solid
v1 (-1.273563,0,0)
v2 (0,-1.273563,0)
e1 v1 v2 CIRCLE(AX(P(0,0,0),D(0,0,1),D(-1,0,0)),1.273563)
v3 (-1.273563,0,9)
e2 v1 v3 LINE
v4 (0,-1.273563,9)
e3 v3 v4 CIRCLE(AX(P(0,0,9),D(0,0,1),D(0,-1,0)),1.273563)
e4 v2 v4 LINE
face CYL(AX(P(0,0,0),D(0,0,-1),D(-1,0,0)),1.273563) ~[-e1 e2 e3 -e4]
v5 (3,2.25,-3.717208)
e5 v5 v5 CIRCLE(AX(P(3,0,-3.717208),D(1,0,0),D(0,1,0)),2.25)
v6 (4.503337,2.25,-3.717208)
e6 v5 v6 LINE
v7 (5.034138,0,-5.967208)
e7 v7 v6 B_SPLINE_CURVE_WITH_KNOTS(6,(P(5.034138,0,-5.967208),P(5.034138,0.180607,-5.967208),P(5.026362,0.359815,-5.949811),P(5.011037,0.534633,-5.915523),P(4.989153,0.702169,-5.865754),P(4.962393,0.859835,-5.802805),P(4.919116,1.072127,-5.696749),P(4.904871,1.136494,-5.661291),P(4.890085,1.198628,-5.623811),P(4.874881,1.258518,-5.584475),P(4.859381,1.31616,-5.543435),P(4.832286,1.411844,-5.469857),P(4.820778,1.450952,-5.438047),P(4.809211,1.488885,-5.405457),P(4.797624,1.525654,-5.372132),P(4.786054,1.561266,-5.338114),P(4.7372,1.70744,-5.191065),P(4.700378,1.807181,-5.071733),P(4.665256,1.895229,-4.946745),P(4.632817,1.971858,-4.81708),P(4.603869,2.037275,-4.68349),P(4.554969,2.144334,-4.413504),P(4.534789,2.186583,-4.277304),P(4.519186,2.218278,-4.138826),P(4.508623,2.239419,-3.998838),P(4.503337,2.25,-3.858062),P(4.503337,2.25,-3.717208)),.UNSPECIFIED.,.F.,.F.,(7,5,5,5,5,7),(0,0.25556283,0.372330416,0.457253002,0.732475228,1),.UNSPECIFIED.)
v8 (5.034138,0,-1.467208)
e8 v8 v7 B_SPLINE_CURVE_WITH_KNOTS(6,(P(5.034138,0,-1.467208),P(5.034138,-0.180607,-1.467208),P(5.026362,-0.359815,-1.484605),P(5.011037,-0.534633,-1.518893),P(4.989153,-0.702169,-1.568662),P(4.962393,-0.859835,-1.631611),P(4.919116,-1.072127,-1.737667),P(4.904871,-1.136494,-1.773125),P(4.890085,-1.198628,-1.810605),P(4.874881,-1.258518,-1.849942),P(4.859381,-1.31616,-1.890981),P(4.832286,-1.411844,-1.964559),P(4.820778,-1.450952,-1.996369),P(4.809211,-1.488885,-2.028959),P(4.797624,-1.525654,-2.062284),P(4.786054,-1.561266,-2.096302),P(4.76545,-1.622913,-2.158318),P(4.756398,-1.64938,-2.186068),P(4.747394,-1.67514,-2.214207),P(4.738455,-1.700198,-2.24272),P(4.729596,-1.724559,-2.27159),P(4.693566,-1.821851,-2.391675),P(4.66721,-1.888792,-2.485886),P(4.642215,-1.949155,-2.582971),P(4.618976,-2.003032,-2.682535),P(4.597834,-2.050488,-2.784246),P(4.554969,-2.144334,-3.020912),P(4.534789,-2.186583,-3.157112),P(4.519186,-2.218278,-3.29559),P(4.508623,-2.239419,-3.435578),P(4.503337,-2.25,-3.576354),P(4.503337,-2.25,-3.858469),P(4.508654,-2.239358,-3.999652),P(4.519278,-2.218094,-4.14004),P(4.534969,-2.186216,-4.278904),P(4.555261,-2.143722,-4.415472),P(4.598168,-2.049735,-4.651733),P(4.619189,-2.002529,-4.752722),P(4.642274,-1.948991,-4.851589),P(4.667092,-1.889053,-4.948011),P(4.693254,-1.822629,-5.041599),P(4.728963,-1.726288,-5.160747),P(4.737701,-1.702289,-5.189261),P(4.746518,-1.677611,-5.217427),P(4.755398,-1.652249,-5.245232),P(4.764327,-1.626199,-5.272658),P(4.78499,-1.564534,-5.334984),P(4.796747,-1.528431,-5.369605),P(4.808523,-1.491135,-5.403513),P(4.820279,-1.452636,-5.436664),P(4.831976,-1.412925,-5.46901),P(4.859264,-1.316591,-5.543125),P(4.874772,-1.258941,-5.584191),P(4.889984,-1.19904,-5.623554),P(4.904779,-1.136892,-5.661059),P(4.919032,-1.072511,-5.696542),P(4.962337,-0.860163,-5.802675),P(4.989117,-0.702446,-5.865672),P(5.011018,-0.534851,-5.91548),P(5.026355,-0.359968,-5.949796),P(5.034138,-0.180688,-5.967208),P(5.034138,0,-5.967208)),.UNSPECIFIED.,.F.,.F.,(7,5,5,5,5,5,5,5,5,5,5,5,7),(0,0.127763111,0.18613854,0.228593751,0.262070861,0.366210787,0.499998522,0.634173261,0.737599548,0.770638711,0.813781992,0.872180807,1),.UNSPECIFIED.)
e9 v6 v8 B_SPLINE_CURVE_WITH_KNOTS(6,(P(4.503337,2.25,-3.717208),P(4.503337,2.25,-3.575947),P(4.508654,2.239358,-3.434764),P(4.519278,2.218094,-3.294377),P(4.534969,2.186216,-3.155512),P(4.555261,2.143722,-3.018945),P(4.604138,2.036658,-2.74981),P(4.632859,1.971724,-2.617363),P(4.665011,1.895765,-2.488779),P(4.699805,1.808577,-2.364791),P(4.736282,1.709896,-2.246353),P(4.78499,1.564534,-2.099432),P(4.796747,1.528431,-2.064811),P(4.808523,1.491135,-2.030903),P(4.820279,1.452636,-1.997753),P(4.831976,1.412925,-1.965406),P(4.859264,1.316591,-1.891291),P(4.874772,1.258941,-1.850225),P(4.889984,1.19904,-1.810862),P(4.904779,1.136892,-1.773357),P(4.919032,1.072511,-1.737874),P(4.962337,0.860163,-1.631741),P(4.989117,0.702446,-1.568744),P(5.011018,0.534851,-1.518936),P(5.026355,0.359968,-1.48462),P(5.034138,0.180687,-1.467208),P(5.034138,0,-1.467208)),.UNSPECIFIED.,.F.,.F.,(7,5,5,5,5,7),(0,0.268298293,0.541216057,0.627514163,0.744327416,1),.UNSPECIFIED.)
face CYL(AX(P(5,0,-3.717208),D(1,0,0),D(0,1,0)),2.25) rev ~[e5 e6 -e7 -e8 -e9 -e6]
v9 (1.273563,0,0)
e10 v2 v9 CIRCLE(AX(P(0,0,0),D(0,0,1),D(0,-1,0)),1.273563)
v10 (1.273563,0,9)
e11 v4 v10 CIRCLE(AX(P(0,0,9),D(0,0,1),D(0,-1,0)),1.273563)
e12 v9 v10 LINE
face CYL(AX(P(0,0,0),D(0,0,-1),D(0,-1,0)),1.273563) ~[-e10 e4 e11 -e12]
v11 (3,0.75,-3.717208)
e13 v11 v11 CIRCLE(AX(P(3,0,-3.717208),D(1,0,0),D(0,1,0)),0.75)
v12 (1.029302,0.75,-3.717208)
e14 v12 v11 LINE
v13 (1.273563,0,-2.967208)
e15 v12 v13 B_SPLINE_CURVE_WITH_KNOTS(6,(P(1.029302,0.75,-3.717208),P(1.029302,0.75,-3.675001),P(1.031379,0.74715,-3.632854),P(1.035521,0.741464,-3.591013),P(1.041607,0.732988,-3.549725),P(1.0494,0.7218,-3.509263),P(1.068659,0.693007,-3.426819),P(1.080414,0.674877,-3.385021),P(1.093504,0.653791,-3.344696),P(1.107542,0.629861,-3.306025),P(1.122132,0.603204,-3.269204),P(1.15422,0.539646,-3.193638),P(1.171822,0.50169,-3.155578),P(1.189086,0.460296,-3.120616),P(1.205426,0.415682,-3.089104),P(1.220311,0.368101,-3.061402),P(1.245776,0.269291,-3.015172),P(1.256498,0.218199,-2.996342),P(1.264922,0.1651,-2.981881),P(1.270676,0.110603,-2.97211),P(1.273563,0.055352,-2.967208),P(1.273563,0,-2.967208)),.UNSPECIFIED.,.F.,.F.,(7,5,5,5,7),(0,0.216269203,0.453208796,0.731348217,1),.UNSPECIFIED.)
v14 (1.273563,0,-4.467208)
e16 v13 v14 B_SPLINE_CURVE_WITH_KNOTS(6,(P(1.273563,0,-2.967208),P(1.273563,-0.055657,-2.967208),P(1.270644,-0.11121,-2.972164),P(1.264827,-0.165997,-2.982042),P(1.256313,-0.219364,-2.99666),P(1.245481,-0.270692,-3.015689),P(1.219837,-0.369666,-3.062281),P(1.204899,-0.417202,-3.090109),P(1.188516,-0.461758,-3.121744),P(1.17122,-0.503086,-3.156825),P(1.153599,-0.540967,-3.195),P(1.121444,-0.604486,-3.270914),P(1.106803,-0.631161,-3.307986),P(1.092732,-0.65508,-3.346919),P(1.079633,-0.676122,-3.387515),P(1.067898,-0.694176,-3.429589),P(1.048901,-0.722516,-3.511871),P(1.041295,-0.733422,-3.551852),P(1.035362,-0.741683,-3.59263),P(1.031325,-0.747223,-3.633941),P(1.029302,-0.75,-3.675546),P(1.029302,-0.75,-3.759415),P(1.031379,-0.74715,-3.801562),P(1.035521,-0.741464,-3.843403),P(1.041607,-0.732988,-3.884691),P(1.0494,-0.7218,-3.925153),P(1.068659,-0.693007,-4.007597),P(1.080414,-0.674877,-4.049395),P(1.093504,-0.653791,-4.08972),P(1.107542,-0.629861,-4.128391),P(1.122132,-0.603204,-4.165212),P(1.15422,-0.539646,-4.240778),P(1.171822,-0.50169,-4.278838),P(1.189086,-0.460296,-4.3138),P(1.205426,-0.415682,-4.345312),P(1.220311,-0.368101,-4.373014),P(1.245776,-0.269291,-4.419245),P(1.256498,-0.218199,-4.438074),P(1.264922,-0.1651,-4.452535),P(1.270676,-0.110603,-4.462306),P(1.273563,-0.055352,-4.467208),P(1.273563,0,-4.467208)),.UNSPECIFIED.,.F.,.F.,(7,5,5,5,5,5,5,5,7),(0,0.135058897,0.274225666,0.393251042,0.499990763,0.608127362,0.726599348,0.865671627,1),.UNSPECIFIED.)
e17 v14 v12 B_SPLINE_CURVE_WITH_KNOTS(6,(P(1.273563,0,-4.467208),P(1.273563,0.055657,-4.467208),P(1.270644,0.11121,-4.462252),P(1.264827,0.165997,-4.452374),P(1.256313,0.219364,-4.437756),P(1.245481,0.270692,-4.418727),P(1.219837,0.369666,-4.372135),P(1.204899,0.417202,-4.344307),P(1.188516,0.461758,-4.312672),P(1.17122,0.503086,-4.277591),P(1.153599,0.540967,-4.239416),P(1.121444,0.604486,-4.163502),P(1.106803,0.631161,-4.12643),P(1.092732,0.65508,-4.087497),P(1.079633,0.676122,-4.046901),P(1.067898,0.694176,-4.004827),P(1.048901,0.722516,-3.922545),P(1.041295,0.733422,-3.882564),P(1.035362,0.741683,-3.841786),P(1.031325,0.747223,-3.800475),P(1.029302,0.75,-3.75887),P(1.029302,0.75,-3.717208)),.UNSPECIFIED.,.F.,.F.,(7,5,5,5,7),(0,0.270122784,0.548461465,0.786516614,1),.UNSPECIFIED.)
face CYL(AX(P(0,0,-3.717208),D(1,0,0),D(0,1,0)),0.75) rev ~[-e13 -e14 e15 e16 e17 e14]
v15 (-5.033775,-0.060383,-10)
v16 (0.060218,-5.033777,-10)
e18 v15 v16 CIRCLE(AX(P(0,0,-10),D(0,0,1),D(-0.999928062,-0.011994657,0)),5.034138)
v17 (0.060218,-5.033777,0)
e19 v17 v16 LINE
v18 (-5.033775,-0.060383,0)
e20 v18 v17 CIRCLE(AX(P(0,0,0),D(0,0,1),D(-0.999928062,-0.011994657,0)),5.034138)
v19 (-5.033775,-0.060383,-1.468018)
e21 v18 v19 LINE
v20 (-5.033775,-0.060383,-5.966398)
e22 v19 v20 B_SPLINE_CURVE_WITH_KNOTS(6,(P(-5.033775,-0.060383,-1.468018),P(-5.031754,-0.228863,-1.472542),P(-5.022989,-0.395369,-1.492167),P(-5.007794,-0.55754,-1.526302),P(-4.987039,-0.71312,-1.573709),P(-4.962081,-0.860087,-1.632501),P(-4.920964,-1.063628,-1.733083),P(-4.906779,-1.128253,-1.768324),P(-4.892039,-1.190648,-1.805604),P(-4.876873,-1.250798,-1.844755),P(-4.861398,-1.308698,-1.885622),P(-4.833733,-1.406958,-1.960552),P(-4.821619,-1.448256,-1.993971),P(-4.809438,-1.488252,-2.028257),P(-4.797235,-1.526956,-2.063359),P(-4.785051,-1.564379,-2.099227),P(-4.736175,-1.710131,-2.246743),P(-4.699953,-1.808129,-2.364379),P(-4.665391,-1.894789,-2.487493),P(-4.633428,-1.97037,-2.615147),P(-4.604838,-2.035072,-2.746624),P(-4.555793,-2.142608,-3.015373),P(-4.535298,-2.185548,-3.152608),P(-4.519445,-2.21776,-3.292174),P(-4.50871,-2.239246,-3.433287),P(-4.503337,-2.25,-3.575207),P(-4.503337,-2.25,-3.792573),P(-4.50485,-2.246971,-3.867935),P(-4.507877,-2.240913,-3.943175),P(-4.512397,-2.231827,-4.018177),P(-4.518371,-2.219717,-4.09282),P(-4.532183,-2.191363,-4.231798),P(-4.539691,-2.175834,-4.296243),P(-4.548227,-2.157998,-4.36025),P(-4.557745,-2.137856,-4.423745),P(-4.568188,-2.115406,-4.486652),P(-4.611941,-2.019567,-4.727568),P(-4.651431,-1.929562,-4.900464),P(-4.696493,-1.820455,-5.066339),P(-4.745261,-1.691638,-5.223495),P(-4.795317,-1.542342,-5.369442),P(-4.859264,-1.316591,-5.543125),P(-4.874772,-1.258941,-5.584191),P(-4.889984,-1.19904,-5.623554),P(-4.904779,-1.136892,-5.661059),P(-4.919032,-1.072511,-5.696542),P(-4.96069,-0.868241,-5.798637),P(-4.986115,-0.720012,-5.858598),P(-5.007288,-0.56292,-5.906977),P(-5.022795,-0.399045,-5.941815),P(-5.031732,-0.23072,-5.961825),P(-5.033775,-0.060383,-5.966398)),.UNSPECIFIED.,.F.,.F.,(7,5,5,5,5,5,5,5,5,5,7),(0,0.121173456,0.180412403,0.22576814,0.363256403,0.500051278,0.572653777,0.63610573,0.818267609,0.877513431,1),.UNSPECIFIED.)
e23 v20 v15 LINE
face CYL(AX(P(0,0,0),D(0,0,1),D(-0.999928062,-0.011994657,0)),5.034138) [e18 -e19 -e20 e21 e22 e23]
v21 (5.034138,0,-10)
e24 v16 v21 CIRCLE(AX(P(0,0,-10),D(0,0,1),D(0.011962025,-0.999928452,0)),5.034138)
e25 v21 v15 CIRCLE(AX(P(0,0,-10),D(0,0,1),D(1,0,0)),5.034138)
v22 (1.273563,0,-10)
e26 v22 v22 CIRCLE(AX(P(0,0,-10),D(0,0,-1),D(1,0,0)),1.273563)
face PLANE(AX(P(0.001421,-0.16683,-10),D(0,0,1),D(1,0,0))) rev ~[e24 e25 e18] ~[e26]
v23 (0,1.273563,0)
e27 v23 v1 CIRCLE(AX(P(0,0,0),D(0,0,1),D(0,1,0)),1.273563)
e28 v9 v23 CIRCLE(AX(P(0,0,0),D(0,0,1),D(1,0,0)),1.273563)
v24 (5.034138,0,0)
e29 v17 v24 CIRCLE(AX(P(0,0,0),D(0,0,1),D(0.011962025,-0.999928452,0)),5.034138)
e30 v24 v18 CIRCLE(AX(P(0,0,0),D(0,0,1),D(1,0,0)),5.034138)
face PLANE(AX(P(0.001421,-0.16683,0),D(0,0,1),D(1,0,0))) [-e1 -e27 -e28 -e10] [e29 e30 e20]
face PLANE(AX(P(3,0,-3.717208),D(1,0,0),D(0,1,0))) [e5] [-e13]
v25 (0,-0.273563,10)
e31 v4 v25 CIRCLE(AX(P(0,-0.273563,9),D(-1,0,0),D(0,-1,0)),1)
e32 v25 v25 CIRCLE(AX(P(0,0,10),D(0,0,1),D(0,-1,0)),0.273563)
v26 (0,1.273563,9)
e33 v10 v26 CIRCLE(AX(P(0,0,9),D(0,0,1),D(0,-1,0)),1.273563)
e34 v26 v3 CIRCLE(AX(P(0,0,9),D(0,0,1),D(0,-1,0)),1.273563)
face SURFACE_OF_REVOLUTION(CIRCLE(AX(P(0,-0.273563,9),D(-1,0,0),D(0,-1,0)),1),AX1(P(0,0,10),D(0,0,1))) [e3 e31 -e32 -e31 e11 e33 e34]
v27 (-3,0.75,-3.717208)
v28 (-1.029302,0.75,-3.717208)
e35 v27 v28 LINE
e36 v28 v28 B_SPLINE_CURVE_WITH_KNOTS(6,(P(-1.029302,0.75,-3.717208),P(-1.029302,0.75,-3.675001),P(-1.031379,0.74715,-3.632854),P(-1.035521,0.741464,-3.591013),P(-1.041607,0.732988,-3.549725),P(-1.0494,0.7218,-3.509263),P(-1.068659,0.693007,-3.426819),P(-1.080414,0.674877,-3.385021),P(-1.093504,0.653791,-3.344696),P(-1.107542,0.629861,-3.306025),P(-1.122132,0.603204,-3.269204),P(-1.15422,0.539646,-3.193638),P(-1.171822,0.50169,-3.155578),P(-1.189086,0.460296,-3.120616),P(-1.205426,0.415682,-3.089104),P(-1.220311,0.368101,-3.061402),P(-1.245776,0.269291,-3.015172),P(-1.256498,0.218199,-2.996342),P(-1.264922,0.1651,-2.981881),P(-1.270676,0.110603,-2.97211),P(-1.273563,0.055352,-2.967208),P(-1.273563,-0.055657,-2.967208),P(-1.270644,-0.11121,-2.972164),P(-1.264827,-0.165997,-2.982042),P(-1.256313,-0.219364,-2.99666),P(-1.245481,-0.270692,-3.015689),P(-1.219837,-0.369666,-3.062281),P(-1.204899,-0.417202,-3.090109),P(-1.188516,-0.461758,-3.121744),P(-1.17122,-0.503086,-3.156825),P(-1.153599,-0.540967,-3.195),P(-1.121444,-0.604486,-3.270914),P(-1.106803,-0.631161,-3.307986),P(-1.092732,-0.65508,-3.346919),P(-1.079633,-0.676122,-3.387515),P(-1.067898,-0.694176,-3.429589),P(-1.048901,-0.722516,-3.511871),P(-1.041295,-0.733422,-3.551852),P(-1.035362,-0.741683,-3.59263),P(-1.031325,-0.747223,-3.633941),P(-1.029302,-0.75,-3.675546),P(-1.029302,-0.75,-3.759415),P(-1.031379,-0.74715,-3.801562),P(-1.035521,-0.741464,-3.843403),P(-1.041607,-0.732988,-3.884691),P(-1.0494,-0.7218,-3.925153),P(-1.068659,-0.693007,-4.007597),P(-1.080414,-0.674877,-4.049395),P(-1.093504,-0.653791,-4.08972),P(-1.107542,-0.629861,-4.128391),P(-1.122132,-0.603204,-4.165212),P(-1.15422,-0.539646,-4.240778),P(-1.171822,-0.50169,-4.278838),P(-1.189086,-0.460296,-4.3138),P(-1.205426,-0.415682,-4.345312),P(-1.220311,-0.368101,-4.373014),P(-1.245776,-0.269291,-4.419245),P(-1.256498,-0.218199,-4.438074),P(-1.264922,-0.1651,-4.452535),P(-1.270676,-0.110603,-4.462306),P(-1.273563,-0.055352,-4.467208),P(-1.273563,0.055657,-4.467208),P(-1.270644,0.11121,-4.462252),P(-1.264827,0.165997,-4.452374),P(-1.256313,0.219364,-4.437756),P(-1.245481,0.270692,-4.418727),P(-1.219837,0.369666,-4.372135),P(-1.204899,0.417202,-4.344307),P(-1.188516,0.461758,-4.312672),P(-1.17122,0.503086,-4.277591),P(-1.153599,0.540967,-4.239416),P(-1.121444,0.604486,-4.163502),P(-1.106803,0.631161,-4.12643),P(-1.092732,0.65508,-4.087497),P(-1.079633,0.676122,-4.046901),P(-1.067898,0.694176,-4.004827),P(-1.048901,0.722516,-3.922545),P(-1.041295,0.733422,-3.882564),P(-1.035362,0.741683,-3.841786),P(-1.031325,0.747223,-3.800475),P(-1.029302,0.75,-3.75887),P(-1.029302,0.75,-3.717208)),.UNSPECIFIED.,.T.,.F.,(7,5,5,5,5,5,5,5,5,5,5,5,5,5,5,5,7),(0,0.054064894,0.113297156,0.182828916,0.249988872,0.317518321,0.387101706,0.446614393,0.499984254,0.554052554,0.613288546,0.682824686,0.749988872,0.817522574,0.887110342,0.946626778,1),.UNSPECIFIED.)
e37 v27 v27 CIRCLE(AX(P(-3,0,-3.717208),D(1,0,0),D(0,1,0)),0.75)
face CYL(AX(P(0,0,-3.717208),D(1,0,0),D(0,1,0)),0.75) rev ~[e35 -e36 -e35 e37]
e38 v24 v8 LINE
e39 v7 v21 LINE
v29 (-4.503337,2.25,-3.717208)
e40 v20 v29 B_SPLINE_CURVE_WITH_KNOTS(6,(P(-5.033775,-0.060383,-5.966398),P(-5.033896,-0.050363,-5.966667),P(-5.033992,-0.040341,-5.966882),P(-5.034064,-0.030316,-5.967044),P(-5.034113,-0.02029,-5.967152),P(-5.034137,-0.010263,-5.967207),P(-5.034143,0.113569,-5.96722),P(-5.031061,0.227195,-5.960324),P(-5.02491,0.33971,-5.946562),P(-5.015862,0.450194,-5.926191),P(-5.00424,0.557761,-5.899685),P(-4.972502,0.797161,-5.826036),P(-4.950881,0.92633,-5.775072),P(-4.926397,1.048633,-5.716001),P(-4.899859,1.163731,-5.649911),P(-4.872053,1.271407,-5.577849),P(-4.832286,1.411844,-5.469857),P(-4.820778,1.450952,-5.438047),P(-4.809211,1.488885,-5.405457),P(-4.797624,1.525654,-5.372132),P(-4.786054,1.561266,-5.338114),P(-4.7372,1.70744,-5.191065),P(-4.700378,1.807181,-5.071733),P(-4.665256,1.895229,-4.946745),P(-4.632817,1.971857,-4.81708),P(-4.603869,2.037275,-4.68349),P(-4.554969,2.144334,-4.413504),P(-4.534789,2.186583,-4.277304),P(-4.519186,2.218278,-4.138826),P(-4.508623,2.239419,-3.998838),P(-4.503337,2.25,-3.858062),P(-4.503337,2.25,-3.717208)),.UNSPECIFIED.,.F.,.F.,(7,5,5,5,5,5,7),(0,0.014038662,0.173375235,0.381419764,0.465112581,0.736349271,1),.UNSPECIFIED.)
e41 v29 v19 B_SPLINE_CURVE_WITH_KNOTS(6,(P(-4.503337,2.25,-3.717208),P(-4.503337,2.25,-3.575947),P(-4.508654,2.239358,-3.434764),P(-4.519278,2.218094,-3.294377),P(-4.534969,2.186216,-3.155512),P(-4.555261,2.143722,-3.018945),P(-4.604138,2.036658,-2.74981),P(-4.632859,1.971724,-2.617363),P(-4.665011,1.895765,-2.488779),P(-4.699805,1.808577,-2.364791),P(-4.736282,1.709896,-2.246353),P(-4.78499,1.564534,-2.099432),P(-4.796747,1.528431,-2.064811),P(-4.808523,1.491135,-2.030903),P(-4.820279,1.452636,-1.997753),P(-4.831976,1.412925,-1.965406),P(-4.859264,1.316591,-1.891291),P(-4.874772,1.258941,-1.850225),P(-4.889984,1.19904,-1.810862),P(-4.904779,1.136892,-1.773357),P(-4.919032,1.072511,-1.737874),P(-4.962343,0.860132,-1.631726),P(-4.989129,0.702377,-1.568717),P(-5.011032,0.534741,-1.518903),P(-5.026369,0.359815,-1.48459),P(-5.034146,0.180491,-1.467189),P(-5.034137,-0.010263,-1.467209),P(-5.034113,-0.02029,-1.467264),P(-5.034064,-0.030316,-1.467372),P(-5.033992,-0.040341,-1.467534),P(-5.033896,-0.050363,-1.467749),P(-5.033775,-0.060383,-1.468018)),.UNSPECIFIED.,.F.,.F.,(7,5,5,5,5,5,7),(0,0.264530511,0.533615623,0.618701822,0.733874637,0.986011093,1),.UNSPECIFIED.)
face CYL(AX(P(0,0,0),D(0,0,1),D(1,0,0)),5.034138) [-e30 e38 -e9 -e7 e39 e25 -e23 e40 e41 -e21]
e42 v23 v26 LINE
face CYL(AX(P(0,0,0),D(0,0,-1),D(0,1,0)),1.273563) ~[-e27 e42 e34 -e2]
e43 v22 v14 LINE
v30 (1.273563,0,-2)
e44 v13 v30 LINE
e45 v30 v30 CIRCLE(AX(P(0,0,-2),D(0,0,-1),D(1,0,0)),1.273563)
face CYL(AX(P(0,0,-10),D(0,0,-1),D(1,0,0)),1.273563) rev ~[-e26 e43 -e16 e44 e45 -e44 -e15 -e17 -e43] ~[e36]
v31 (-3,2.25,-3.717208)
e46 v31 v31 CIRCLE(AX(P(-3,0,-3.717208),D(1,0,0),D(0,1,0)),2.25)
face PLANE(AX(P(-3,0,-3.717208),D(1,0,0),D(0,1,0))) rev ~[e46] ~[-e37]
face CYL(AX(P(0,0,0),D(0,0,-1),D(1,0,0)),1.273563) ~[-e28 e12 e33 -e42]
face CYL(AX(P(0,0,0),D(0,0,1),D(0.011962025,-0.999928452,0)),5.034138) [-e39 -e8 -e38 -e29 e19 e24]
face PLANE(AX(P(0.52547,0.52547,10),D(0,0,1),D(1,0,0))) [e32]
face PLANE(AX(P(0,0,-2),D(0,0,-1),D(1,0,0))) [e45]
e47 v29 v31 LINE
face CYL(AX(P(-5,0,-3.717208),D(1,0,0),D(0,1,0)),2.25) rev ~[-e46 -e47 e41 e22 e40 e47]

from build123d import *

# Parameters (mm, degrees)
F1_DEPTH  = 10
F2_DEPTH  = 10
F4_R      = 1.2735627731
F5_DEPTH  = 8
F6_R      = 0.75
F7_DEPTH  = 12.5
F9_R      = 2.25
F9_R_2    = 0.75
F10_DEPTH = 2
F12_R     = 2.25
F12_R_2   = 0.75
F13_DEPTH = 2


# Not quite as in the source:
# - a fillet or chamfer that OpenCascade refuses, or shapes differently, is made with other operations: its cross-section is extruded or revolved along the edge and cut away or added
# - a feature names something its author has since deleted; it is built from what else it names


with BuildPart() as f1:
    # F0 (on Top) → F1 (new body)
    with BuildSketch(Plane.XY):
        with BuildLine():
            Line((0, 0), (1.2735627731, 0))
            ThreePointArc((1.2735627731, 0), (0.9005448731, 0.9005448731), (0, 1.2735627731))
            Line((0, 1.2735627731), (0, 0))
        make_face()
        with BuildLine():
            Line((0, 0), (0, 1.2735627731))
            ThreePointArc((0, 1.2735627731), (-0.9005448731, 0.9005448731), (-1.2735627731, 0))
            Line((-1.2735627731, 0), (0, 0))
        make_face()
        with BuildLine():
            ThreePointArc((-1.2735627731, 0), (-0.9005448731, -0.9005448731), (0, -1.2735627731))
            Line((0, -1.2735627731), (0, 0))
            Line((0, 0), (-1.2735627731, 0))
        make_face()
        with BuildLine():
            ThreePointArc((0, -1.2735627731), (0.9005448731, -0.9005448731), (1.2735627731, 0))
            Line((1.2735627731, 0), (0, 0))
            Line((0, 0), (0, -1.2735627731))
        make_face()
    extrude(amount=F1_DEPTH)

    # F0 (on Top) → F2 (join)
    with BuildSketch(Plane.XY):
        with BuildLine():
            ThreePointArc((0.0602184818, -5.0337774218), (3.5808999931, -3.5383183346), (5.0341376022, 0))
            ThreePointArc((5.0341376022, 0), (-0.0301919188, 5.0340470643), (-5.033775454, -0.0603827516))
            ThreePointArc((-5.033775454, -0.0603827516), (-3.5167784797, -3.6020564297), (0.0602184818, -5.0337774218))
        make_face()
        with BuildLine():
            ThreePointArc((0, 1.2735627731), (0.9005448731, 0.9005448731), (1.2735627731, 0))
            ThreePointArc((1.2735627731, 0), (0.9005448731, -0.9005448731), (0, -1.2735627731))
            ThreePointArc((0, -1.2735627731), (-0.9005448731, -0.9005448731), (-1.2735627731, 0))
            ThreePointArc((-1.2735627731, 0), (-0.9005448731, 0.9005448731), (0, 1.2735627731))
        make_face(mode=Mode.SUBTRACT)
        with BuildLine():
            Line((0, 0), (1.2735627731, 0))
            ThreePointArc((1.2735627731, 0), (0.9005448731, 0.9005448731), (0, 1.2735627731))
            Line((0, 1.2735627731), (0, 0))
        make_face()
        with BuildLine():
            Line((0, 0), (0, 1.2735627731))
            ThreePointArc((0, 1.2735627731), (-0.9005448731, 0.9005448731), (-1.2735627731, 0))
            Line((-1.2735627731, 0), (0, 0))
        make_face()
        with BuildLine():
            ThreePointArc((-1.2735627731, 0), (-0.9005448731, -0.9005448731), (0, -1.2735627731))
            Line((0, -1.2735627731), (0, 0))
            Line((0, 0), (-1.2735627731, 0))
        make_face()
        with BuildLine():
            ThreePointArc((0, -1.2735627731), (0.9005448731, -0.9005448731), (1.2735627731, 0))
            Line((1.2735627731, 0), (0, 0))
            Line((0, 0), (0, -1.2735627731))
        make_face()
    extrude(amount=-F2_DEPTH)

    # F3: fillet of radius 1 on 1 edges, made by hand

    # F3_s1 → F3_t2 (revolve, cut)
    with BuildSketch(Plane.YZ):
        with BuildLine():
            ThreePointArc((-1.2735627731, 9), (-0.9806695543, 9.7071067812), (-0.2735627731, 10))
            Line((-0.2735627731, 10), (-1.2735627731, 10))
            Line((-1.2735627731, 10), (-1.2735627731, 9))
        make_face()
    revolve(axis=Axis((0, 0, 10), (0, 0, 1)), mode=Mode.SUBTRACT)

    # F4 (on face) → F5 (cut)
    with BuildSketch(Plane(origin=(0, 0, -10), x_dir=(1, 0, 0), z_dir=(0, 0, -1))):
        Circle(F4_R)
    extrude(amount=-F5_DEPTH, mode=Mode.SUBTRACT)

    # F6 (on Right) → F7 (cut, symmetric)
    with BuildSketch(Plane.YZ):
        with Locations((0, -3.7172080483)):
            Circle(F6_R)
    extrude(amount=F7_DEPTH, both=True, mode=Mode.SUBTRACT)

    # F9 (on offset) → F10 (cut, symmetric)
    with BuildSketch(Plane.YZ.offset(5)):
        with Locations((0, -3.7172080483)):
            Circle(F9_R)
        with Locations((0, -3.7172080483)):
            Circle(F9_R_2, mode=Mode.SUBTRACT)
    extrude(amount=F10_DEPTH, both=True, mode=Mode.SUBTRACT)

    # F12 (on offset) → F13 (cut, symmetric)
    with BuildSketch(Plane.YZ.offset(-5)):
        with Locations((0, -3.7172080483)):
            Circle(F12_R)
        with Locations((0, -3.7172080483)):
            Circle(F12_R_2, mode=Mode.SUBTRACT)
    extrude(amount=F13_DEPTH, both=True, mode=Mode.SUBTRACT)


solid = f1.part
